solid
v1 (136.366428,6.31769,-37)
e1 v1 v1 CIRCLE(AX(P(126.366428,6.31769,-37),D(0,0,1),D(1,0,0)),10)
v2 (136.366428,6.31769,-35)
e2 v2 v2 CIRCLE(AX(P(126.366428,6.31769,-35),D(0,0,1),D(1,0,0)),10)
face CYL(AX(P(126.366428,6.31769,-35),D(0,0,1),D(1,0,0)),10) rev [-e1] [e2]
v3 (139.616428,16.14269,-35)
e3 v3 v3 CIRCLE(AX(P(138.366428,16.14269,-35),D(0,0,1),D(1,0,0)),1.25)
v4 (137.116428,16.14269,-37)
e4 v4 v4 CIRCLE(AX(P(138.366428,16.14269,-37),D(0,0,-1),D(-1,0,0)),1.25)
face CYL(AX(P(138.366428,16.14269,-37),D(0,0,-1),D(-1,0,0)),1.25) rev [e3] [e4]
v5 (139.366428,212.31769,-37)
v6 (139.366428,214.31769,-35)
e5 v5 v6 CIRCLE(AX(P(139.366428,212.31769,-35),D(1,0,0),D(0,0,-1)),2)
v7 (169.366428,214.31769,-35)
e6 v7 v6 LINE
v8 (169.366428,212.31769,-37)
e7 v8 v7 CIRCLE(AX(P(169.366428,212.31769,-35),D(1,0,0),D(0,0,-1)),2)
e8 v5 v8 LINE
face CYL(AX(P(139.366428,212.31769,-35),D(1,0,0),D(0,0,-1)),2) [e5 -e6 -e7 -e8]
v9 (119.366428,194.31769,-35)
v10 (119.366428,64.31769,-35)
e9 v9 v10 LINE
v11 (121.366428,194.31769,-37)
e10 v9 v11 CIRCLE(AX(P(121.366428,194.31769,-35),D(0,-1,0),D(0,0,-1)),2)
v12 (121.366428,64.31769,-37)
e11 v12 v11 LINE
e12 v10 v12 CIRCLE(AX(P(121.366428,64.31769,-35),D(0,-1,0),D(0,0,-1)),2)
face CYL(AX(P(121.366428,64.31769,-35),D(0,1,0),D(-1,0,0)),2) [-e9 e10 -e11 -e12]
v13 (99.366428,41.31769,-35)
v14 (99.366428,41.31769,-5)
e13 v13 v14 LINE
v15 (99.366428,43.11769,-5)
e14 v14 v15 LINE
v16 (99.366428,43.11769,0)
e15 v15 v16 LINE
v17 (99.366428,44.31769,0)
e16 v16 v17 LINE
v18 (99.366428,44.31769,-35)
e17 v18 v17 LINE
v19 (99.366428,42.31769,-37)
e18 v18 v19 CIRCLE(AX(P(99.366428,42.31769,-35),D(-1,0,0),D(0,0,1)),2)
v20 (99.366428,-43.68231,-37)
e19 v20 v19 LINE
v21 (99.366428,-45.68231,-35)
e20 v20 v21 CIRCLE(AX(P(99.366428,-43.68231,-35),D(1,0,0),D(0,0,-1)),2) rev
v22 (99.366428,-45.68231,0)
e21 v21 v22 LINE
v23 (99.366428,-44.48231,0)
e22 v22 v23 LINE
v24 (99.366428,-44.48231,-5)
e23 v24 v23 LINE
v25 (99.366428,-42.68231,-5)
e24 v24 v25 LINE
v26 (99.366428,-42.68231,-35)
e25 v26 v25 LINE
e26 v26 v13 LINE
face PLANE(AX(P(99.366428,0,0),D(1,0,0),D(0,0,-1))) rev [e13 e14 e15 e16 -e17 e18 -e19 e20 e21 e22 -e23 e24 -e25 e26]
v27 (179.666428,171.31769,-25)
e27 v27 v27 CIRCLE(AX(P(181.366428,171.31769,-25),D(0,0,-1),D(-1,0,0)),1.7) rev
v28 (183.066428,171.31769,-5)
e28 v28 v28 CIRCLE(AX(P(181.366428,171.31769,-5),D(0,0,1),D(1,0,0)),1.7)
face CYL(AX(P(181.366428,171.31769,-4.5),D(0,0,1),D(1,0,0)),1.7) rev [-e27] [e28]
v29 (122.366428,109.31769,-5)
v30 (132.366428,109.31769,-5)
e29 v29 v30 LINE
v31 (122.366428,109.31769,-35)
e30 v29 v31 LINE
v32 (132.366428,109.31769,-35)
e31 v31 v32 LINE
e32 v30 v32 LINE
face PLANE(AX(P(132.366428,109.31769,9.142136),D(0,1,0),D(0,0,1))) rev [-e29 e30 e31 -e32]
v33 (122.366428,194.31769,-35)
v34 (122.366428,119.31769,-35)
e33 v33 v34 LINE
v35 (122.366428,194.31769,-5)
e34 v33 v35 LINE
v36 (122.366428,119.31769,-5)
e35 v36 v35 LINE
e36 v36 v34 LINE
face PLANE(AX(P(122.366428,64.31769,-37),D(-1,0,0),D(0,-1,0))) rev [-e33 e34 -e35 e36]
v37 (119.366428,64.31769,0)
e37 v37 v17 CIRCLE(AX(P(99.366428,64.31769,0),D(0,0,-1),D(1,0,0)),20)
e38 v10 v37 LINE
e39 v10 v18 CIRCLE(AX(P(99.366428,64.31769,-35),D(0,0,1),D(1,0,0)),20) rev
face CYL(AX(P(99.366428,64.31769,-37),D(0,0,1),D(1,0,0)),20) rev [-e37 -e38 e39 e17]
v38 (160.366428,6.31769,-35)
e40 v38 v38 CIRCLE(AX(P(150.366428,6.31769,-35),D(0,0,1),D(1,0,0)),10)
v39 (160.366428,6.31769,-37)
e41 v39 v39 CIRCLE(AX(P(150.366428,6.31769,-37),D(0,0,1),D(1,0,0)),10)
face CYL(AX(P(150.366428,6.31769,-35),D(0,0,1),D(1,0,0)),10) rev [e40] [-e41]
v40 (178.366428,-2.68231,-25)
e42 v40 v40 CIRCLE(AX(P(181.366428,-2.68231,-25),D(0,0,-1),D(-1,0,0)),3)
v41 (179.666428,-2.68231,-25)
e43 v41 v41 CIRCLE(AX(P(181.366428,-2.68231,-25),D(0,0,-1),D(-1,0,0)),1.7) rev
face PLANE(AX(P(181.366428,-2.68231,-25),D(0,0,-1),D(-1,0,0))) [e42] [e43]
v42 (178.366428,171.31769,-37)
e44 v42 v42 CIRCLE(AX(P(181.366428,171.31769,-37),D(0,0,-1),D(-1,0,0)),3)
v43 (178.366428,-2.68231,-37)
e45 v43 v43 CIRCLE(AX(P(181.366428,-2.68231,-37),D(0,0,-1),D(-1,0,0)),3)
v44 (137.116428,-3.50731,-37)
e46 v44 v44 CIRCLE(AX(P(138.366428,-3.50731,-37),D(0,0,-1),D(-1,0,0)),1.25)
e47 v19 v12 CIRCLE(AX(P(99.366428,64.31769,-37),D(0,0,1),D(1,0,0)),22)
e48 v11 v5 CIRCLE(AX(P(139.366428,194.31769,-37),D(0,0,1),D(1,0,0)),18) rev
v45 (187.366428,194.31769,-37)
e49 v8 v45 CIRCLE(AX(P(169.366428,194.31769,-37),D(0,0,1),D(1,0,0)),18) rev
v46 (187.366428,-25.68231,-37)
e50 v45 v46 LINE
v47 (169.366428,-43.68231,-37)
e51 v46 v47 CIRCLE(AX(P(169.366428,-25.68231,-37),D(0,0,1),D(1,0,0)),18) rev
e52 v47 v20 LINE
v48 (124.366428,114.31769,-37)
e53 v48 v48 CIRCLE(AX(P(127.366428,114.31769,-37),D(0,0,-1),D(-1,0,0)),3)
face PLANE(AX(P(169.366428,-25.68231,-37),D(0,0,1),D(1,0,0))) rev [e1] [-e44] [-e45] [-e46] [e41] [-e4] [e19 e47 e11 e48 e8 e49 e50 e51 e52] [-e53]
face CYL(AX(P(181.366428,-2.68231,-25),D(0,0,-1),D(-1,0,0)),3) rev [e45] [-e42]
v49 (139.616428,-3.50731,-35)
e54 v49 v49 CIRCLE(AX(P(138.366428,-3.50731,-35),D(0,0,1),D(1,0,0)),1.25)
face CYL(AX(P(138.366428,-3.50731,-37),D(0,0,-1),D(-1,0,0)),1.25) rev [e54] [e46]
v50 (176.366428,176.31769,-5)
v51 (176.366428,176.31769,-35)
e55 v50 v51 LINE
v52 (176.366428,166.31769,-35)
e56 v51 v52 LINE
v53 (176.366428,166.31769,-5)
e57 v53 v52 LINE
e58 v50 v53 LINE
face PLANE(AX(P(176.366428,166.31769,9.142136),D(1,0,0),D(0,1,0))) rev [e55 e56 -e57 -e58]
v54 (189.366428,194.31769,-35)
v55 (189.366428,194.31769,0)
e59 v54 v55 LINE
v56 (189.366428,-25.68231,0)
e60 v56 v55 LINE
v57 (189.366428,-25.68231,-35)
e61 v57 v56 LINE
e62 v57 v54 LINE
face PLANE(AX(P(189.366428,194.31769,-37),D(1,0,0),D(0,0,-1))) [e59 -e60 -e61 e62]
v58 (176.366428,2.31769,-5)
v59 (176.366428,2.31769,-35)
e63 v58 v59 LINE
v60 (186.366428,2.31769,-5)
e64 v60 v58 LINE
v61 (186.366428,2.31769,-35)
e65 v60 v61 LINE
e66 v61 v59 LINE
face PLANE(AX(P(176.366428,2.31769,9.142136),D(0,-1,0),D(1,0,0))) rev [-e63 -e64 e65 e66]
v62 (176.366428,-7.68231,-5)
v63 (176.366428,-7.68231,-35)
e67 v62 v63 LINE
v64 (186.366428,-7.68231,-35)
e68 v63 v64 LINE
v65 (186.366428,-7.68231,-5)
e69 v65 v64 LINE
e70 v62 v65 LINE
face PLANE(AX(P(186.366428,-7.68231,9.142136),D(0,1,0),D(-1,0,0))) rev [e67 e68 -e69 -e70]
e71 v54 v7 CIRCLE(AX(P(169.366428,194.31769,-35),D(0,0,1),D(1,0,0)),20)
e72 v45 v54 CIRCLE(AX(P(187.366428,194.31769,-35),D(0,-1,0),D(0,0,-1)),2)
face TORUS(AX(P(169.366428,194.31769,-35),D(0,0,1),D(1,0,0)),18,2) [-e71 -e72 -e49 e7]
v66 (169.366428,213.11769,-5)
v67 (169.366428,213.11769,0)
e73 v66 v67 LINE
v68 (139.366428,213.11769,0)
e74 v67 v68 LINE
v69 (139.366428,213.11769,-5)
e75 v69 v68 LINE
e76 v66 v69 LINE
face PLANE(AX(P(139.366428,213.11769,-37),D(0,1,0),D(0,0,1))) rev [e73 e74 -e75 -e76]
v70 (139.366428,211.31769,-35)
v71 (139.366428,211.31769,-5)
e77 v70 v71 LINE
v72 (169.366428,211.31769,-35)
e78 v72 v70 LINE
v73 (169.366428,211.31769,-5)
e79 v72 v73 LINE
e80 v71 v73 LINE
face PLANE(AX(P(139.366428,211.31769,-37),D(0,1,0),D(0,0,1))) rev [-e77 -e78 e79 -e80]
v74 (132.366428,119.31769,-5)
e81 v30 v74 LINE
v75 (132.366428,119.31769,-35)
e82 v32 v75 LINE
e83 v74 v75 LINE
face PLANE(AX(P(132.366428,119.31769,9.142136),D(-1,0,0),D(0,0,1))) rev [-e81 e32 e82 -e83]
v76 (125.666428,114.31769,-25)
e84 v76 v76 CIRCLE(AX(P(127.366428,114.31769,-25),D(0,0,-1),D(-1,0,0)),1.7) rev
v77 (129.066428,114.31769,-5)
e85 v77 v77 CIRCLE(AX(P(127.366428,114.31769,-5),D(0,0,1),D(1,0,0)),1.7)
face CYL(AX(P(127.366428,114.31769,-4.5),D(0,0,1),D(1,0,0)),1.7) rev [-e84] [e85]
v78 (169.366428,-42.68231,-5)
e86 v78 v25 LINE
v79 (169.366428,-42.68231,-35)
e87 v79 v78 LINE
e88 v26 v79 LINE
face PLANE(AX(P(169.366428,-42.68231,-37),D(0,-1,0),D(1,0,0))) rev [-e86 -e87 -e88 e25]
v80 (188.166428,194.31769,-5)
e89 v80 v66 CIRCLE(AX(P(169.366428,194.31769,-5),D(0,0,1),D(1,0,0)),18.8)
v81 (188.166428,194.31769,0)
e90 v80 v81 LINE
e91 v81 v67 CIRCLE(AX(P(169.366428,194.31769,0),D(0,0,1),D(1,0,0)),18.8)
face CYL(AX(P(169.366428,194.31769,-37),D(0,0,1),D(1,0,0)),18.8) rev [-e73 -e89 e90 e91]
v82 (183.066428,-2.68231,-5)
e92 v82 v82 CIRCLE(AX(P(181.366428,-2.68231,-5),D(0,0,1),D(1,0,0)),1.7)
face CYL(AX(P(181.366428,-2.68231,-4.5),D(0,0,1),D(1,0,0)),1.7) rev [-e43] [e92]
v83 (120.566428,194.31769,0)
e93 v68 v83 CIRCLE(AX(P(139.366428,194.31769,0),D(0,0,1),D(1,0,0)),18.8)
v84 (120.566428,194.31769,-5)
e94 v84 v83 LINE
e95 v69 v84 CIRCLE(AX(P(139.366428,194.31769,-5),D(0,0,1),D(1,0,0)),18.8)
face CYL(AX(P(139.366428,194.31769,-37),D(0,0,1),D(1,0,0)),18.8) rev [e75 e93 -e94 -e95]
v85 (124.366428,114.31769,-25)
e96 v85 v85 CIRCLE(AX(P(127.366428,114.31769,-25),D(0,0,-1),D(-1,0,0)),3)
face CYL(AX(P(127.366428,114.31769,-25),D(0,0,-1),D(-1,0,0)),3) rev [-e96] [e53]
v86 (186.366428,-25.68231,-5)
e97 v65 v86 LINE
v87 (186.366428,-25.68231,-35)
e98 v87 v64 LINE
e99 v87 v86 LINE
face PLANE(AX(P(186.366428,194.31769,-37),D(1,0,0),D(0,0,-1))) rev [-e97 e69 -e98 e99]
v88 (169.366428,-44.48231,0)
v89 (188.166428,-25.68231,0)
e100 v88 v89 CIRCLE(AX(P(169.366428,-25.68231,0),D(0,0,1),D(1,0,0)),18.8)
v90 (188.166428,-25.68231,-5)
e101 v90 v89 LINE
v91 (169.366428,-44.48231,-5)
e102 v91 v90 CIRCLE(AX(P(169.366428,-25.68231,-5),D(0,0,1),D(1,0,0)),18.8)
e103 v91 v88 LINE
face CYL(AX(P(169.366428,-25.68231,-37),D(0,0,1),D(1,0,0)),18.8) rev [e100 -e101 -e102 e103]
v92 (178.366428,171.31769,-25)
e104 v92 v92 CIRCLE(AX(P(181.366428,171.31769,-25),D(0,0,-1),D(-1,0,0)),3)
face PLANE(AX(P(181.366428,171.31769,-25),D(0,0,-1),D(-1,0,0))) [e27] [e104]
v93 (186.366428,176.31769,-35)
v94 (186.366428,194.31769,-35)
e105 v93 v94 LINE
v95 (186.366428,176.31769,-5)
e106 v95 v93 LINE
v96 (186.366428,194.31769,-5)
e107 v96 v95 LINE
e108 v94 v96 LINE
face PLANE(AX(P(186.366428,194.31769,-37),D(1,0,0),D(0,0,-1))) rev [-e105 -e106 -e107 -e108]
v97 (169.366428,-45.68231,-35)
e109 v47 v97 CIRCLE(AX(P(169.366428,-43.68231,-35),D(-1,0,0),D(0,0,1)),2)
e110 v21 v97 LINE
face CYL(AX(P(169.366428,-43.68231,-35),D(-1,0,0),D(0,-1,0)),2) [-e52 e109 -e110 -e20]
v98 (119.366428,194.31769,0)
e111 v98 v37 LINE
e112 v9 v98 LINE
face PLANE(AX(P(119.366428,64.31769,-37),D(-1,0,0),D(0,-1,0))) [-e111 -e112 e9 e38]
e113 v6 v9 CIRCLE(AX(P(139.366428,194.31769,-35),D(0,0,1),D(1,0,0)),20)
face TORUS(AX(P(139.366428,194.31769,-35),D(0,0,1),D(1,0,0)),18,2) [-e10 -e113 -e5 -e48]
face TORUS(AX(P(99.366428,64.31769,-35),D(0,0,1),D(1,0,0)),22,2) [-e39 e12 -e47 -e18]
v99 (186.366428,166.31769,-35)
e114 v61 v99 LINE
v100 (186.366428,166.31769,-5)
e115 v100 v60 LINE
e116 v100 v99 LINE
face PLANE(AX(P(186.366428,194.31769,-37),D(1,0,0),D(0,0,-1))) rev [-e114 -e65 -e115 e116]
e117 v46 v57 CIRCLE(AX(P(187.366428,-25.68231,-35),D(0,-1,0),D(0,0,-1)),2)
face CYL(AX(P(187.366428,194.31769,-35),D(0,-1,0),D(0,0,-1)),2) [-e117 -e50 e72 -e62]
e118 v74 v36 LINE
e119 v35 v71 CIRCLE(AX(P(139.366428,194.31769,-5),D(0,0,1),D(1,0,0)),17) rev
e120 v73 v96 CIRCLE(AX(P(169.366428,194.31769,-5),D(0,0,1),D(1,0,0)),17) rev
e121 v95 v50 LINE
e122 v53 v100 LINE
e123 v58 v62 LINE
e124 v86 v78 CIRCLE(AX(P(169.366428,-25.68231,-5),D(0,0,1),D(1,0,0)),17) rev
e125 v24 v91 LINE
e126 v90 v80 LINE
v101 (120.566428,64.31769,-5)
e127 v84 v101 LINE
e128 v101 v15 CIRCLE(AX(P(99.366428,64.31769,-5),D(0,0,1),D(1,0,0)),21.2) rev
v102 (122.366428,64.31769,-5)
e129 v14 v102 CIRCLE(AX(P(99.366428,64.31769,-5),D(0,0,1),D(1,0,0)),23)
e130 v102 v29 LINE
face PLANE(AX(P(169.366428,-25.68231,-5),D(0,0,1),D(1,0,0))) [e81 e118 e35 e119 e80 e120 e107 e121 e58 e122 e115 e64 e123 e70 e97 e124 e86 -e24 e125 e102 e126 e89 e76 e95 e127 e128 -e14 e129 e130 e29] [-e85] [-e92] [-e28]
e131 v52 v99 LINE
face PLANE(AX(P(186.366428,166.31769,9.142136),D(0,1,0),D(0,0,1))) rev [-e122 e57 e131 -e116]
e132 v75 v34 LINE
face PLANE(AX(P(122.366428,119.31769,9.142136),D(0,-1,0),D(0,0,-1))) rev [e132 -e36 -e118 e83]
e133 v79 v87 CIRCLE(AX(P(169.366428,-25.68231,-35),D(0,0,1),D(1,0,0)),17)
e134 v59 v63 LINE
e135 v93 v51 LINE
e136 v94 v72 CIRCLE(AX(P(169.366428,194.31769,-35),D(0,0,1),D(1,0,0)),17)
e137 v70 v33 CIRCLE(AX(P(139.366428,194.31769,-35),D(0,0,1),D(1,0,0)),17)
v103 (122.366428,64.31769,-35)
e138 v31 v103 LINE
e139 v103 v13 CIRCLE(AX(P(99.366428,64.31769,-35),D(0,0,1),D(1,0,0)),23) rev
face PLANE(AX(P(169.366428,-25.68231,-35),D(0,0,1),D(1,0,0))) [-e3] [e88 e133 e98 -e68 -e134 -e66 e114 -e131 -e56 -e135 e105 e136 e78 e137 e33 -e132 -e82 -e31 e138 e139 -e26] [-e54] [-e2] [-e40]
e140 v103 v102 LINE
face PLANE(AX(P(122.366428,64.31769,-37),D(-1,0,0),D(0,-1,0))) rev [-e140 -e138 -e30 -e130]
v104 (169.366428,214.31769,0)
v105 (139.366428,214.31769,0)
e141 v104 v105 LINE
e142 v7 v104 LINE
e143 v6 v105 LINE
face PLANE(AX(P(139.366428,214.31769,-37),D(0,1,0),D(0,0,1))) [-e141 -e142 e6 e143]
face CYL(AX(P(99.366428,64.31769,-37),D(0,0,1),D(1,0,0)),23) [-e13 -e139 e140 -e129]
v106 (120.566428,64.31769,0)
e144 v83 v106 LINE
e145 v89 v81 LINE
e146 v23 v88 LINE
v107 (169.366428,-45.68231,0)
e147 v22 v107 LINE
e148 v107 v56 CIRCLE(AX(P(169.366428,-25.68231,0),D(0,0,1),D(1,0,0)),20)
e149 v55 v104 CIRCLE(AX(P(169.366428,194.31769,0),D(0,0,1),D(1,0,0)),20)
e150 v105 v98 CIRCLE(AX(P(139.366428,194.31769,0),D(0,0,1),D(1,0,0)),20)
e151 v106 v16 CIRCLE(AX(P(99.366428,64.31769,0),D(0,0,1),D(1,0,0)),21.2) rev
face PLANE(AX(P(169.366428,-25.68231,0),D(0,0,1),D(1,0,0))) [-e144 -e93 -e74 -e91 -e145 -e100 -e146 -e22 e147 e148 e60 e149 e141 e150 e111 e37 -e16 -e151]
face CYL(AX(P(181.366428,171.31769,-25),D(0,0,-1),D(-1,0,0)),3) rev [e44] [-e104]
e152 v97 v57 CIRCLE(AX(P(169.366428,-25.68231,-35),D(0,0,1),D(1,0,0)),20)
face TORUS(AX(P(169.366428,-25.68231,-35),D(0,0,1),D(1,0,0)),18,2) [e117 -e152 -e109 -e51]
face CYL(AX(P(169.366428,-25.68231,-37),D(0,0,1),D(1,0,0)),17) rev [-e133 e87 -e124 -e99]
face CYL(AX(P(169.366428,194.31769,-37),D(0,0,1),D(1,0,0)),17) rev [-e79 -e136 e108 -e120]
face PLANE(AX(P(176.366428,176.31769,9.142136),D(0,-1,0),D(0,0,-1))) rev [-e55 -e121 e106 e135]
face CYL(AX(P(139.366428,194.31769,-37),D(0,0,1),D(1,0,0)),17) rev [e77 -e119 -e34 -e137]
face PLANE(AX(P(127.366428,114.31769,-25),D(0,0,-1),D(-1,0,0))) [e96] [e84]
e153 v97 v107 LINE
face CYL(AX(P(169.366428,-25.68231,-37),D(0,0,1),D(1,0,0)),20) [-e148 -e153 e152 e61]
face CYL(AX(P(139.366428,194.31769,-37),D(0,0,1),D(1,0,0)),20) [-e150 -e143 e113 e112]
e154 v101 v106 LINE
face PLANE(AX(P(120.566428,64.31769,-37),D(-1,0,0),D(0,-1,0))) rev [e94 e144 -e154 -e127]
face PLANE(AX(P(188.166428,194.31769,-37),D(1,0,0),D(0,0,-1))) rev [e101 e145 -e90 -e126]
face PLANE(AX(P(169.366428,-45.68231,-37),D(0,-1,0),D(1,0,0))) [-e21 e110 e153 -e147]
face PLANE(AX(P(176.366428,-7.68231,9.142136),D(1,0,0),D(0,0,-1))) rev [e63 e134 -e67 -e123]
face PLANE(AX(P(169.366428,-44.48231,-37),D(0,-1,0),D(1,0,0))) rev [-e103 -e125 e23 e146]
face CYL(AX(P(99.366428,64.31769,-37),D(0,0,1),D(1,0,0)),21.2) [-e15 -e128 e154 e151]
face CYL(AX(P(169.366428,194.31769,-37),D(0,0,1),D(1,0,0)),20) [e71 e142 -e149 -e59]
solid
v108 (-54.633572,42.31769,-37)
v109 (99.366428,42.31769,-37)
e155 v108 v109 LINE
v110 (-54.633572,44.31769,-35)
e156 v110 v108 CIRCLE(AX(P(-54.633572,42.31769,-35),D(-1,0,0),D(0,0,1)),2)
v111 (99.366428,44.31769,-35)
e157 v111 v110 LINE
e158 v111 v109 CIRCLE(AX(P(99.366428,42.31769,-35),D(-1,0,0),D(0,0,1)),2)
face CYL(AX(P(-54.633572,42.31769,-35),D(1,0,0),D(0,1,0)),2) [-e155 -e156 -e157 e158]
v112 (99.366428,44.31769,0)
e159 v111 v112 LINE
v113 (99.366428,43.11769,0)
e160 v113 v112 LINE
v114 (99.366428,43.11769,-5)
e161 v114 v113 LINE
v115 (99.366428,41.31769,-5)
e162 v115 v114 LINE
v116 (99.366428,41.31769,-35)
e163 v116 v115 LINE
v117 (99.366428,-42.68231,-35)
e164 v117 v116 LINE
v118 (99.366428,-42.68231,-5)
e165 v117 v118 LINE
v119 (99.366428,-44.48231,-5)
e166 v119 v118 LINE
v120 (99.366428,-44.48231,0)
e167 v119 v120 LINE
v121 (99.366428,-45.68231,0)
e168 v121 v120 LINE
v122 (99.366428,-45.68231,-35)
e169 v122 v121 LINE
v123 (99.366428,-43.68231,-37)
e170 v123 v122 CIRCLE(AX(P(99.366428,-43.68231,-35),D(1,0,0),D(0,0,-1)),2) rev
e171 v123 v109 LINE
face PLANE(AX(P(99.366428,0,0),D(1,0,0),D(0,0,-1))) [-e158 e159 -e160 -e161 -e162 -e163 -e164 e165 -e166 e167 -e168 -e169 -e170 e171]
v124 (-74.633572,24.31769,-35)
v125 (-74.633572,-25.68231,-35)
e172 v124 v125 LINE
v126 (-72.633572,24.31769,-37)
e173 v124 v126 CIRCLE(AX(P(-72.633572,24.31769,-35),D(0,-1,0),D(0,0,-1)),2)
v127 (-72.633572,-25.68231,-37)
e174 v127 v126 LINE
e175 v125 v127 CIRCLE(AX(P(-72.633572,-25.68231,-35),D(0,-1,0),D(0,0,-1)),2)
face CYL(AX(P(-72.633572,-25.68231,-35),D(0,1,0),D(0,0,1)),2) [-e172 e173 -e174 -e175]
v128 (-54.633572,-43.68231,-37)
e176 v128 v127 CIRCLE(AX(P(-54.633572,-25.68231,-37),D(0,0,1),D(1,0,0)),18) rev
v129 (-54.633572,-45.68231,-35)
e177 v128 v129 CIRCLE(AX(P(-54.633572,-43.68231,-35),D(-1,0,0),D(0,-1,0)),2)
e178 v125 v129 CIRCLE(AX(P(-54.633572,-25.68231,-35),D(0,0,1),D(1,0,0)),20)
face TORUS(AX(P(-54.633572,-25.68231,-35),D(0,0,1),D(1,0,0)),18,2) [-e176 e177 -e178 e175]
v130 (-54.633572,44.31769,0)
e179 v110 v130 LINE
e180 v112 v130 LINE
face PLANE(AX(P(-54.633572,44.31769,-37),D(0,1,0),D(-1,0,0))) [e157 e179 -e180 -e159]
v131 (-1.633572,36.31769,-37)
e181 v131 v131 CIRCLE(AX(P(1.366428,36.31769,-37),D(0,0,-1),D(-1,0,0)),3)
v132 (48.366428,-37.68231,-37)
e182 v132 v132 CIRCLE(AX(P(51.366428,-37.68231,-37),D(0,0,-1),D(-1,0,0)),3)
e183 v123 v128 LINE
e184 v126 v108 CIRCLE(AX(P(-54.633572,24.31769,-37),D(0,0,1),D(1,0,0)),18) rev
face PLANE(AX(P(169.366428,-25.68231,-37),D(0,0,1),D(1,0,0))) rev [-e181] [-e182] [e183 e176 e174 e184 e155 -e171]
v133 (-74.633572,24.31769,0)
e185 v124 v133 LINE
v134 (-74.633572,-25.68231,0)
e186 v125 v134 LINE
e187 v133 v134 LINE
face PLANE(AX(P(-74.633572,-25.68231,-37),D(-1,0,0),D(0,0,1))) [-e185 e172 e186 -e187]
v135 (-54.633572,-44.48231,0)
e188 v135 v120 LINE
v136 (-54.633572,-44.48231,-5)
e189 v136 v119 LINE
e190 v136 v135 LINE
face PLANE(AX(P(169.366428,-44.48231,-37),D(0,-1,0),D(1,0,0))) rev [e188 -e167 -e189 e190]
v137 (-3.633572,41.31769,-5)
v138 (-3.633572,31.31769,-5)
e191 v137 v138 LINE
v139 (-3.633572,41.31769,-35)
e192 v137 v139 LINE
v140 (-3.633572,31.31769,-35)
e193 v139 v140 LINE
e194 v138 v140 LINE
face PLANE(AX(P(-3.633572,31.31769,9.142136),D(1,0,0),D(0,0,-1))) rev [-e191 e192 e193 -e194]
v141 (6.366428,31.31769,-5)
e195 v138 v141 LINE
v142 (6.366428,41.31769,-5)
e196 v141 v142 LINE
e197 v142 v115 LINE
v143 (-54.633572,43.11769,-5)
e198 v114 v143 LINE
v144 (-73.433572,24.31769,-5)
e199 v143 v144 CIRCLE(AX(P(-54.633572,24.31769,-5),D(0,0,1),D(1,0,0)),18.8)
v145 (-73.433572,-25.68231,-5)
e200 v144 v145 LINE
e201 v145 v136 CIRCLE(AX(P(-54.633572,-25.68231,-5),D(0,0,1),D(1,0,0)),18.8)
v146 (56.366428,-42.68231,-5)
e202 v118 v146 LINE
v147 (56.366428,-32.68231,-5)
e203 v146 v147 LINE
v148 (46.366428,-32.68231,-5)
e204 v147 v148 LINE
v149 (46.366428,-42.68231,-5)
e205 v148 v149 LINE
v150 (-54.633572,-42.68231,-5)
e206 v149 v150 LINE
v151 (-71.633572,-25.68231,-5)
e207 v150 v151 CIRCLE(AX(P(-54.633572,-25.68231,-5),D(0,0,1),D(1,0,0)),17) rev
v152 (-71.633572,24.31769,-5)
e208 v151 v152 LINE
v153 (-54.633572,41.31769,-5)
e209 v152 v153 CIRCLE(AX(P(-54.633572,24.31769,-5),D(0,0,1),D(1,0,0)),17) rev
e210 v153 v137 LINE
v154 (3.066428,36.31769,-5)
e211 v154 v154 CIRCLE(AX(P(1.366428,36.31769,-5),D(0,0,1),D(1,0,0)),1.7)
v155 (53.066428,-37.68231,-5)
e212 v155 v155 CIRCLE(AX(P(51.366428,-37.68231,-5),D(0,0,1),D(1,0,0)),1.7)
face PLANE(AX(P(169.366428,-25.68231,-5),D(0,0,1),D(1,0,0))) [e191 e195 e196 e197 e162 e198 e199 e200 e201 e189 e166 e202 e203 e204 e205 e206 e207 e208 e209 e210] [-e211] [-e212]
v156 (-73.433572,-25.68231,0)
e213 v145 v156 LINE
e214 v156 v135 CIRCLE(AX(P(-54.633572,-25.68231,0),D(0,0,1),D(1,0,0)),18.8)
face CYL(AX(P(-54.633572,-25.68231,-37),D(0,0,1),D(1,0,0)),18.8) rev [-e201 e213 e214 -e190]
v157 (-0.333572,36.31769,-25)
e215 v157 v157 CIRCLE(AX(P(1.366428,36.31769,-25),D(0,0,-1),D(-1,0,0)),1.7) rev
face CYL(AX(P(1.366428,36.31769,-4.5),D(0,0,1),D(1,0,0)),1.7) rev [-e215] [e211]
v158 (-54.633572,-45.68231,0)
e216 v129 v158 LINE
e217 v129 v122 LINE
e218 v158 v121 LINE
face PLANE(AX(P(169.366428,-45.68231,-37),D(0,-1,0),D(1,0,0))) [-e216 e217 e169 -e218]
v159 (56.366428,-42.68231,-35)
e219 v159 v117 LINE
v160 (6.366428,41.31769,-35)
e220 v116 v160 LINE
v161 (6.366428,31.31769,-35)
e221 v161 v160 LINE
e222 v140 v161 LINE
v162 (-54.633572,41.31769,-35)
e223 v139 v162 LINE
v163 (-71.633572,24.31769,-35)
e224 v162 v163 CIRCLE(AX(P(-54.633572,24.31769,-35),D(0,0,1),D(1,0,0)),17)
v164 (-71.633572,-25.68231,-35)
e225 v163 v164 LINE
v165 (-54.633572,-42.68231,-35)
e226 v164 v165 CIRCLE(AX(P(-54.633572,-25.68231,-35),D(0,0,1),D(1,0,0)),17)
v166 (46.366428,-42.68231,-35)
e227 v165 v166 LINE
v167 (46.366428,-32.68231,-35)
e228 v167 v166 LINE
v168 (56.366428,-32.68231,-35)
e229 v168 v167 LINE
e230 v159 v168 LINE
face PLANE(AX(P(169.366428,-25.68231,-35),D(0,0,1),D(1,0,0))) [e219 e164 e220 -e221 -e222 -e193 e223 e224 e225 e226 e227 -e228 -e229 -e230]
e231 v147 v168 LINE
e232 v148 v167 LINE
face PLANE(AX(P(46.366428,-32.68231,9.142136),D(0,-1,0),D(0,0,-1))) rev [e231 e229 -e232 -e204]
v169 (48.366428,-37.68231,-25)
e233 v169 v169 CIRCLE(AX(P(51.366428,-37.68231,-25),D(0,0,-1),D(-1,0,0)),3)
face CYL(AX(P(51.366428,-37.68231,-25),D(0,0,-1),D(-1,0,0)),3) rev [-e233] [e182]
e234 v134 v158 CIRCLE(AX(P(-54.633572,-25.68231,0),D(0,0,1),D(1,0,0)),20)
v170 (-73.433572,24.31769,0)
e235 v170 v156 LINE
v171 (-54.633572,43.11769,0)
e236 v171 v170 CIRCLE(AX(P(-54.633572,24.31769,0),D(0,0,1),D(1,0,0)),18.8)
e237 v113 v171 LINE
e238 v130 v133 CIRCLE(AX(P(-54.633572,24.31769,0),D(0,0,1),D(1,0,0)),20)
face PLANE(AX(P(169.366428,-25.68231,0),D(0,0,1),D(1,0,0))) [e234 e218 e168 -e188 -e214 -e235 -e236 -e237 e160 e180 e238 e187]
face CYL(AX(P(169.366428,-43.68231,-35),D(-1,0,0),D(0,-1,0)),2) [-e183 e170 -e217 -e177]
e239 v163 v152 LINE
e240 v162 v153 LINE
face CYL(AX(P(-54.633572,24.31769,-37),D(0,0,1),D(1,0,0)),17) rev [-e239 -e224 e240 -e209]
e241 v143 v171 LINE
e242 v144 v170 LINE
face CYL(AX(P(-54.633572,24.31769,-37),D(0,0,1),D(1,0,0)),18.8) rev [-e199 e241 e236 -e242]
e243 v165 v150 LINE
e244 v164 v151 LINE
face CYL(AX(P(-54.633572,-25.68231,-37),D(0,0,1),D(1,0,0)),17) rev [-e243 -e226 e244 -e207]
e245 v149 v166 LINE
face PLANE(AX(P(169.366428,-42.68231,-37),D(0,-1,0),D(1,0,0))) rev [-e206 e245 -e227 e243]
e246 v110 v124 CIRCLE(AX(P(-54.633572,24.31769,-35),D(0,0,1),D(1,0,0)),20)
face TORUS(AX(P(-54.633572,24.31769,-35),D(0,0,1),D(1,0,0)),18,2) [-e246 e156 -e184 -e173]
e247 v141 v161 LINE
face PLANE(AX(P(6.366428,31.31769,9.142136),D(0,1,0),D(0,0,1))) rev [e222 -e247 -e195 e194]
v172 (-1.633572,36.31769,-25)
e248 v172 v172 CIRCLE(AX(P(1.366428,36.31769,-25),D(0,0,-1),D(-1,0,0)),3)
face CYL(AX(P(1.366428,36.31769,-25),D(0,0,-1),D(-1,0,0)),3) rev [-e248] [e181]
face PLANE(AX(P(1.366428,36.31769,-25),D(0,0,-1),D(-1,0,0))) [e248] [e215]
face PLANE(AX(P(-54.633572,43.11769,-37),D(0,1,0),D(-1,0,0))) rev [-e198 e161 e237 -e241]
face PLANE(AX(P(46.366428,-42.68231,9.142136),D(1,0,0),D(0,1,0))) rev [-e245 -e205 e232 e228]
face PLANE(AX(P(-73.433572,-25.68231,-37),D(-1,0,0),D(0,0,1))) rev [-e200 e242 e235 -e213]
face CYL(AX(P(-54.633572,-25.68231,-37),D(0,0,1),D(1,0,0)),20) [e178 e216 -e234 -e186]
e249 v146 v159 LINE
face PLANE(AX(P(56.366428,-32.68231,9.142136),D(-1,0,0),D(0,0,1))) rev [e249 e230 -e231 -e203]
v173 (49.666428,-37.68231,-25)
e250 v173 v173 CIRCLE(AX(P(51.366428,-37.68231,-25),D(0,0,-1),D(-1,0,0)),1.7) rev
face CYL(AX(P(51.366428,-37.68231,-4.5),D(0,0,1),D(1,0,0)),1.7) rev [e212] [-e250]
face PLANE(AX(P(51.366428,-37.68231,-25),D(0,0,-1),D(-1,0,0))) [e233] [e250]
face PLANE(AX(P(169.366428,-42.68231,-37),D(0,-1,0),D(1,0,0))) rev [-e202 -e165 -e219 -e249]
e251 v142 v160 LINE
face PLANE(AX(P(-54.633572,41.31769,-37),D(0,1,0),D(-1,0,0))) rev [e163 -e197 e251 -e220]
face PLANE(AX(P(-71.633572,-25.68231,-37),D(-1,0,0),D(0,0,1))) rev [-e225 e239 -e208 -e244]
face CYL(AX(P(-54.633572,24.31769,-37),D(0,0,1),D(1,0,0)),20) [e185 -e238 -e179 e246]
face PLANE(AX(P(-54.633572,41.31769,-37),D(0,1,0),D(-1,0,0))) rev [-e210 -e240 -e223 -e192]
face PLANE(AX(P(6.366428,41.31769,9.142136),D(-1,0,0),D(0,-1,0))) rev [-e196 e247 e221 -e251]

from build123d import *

# Parameters (mm, degrees)
BOX_EXTRUDE_DEPTH                 = 37
SHELL1_T                          = -1.2
SHELL1_THICKNESS_2_DEPTH          = 30.8
SHELL2_START                      = -35
SHELL2_DEPTH                      = 30
SKETCH2_W                         = 10
SKETCH2_H                         = 10
SQUARES_EXTRUDE_DEPTH             = 30
SQUARES_M3_CLEARANCE_HOLES_D      = 3.4
SQUARES_M3_CLEARANCE_HOLES_DEPTH  = 46
SQUARES_M3_CLEARANCE_HOLES_TIP    = 1.021463052
SKETCH5_R                         = 3
SQUARESCREWS_CUT_EXTRUDE_DEPTH    = 12
FILLET1_R                         = 2
DOVETAIL_M18_CLEARANCE_HOLE_D     = 20
DOVETAIL_M18_CLEARANCE_HOLE_DEPTH = 46
DOVETAIL_M18_CLEARANCE_HOLE_TIP   = 6.00860619
DOVETAIL_M3_CLEARANCE_HOLE_D      = 2.5
DOVETAIL_M3_CLEARANCE_HOLE_DEPTH  = 46
DOVETAIL_M3_CLEARANCE_HOLE_TIP    = 0.751075774


# Read off the part's stored shape, not the designer's step: Shell2
with BuildPart() as part:
    # Sketch1 → Box-Extrude (new body)
    with BuildSketch(Plane.XY):
        with BuildLine():
            Line((189.366428174, 55.055128635), (189.366428174, -25.682309997))
            ThreePointArc((189.366428174, -25.682309997), (183.508563798, -39.824445621), (169.366428174, -45.682309997))
            Line((169.366428174, -45.682309997), (0, -45.682309997))
            Line((0, -45.682309997), (-54.633571826, -45.682309997))
            ThreePointArc((-54.633571826, -45.682309997), (-68.77570745, -39.824445621), (-74.633571826, -25.682309997))
            Line((-74.633571826, -25.682309997), (-74.633571826, 24.317690003))
            ThreePointArc((-74.633571826, 24.317690003), (-68.77570745, 38.459825627), (-54.633571826, 44.317690003))
            Line((-54.633571826, 44.317690003), (99.366428174, 44.317690003))
            ThreePointArc((99.366428174, 44.317690003), (109.72858945, 47.211386671), (117.092255571, 55.055128635))
            ThreePointArc((117.092255571, 55.055128635), (118.789565767, 59.548861422), (119.366428174, 64.317690003))
            Line((119.366428174, 64.317690003), (119.366428174, 194.317690003))
            ThreePointArc((119.366428174, 194.317690003), (125.22429255, 208.459825627), (139.366428174, 214.317690003))
            Line((139.366428174, 214.317690003), (169.366428174, 214.317690003))
            ThreePointArc((169.366428174, 214.317690003), (183.508563798, 208.459825627), (189.366428174, 194.317690003))
            Line((189.366428174, 194.317690003), (189.366428174, 55.055128635))
        make_face()
    extrude(amount=-BOX_EXTRUDE_DEPTH)

    # Shell1
    shell1_openings = [part.faces().sort_by_distance(p)[0] for p in [
        (90.029023859, 42.316719336, 0),
    ]]
    offset(amount=SHELL1_T, openings=shell1_openings, kind=Kind.INTERSECTION)

    # Shell1 thickness 2 face (on inner face of the shell) → Shell1 thickness 2 (add)
    with BuildSketch(Plane(origin=(90.047419114, 41.98561552, -35.8), x_dir=(-1, 0, 0), z_dir=(0, 0, -1))):
        with BuildLine():
            Line((-9.31900906, 1.132074483), (144.68099094, 1.132074483))
            ThreePointArc((144.68099094, 1.132074483), (157.974598426, -4.374318031), (163.48099094, -17.667925517))
            Line((163.48099094, -17.667925517), (163.48099094, -67.667925517))
            ThreePointArc((163.48099094, -67.667925517), (157.974598426, -80.961533003), (144.68099094, -86.467925517))
            Line((144.68099094, -86.467925517), (-79.31900906, -86.467925517))
            ThreePointArc((-79.31900906, -86.467925517), (-92.612616546, -80.961533003), (-98.11900906, -67.667925517))
            Line((-98.11900906, -67.667925517), (-98.11900906, 152.332074483))
            ThreePointArc((-98.11900906, 152.332074483), (-92.612616546, 165.625681969), (-79.31900906, 171.132074483))
            Line((-79.31900906, 171.132074483), (-49.31900906, 171.132074483))
            ThreePointArc((-49.31900906, 171.132074483), (-36.025401574, 165.625681969), (-30.51900906, 152.332074483))
            Line((-30.51900906, 152.332074483), (-30.51900906, 22.332074483))
            ThreePointArc((-30.51900906, 22.332074483), (-24.309672821, 7.341410722), (-9.31900906, 1.132074483))
        make_face()
    extrude(amount=-SHELL1_THICKNESS_2_DEPTH)

    # Shell2 outline → Shell2 (cut)
    with BuildSketch(Plane.XY.offset(SHELL2_START)):
        with BuildLine():
            Line((-54.633571826, -42.682309997), (169.366428174, -42.682309997))
            ThreePointArc((169.366428174, -42.682309997), (181.387243454, -37.703125277), (186.366428174, -25.682309997))
            Line((186.366428174, -25.682309997), (186.366428174, 194.317690003))
            ThreePointArc((186.366428174, 194.317690003), (181.387243454, 206.338505283), (169.366428174, 211.317690003))
            Line((169.366428174, 211.317690003), (139.366428174, 211.317690003))
            ThreePointArc((139.366428174, 211.317690003), (127.345612894, 206.338505283), (122.366428174, 194.317690003))
            Line((122.366428174, 194.317690003), (122.366428174, 64.317690003))
            ThreePointArc((122.366428174, 64.317690003), (115.629884141, 48.054234036), (99.366428174, 41.317690003))
            Line((99.366428174, 41.317690003), (-54.633571826, 41.317690003))
            ThreePointArc((-54.633571826, 41.317690003), (-66.654387106, 36.338505283), (-71.633571826, 24.317690003))
            Line((-71.633571826, 24.317690003), (-71.633571826, -25.682309997))
            ThreePointArc((-71.633571826, -25.682309997), (-66.654387106, -37.703125277), (-54.633571826, -42.682309997))
        make_face()
    extrude(amount=SHELL2_DEPTH, mode=Mode.SUBTRACT)

    # Sketch2 → Squares-Extrude (add)
    with BuildSketch(Plane.XY.offset(-35)):
        with Locations((1.366428174, 36.317690003)):
            Rectangle(SKETCH2_W, SKETCH2_H)
        with Locations((127.366428174, 114.317690003)):
            Rectangle(SKETCH2_W, SKETCH2_H)
        with Locations((51.366428174, -37.682309997)):
            Rectangle(SKETCH2_W, SKETCH2_H)
        with Locations((181.366428174, -2.682309997)):
            Rectangle(SKETCH2_W, SKETCH2_H)
        with Locations((181.366428174, 171.317690003)):
            Rectangle(SKETCH2_W, SKETCH2_H)
    extrude(amount=SQUARES_EXTRUDE_DEPTH)

    # Squares M3 Clearance Holes
    with Locations(Plane(origin=(0, 0, -4.5), x_dir=(-1, 0, 0), z_dir=(0, 0, 1))):
        with Locations((-51.366428174, 37.682309997), (-1.366428174, -36.317690003), (-181.366428174, 2.682309997), (-127.366428174, -114.317690003), (-181.366428174, -171.317690003)):
            Hole(SQUARES_M3_CLEARANCE_HOLES_D / 2, depth=SQUARES_M3_CLEARANCE_HOLES_DEPTH)
            with Locations((0, 0, -(SQUARES_M3_CLEARANCE_HOLES_DEPTH + SQUARES_M3_CLEARANCE_HOLES_TIP / 2))):  # 118° drill point
                Cone(0, SQUARES_M3_CLEARANCE_HOLES_D / 2, SQUARES_M3_CLEARANCE_HOLES_TIP, mode=Mode.SUBTRACT)

    # Sketch5 → SquareScrews Cut-Extrude (cut)
    with BuildSketch(Plane(origin=(0, 0, -37), x_dir=(-1, 0, 0), z_dir=(0, 0, -1))):
        with Locations((-181.366428174, 171.317690003)):
            Circle(SKETCH5_R)
        with Locations((-181.366428174, -2.682309997)):
            Circle(SKETCH5_R)
        with Locations((-51.366428174, -37.682309997)):
            Circle(SKETCH5_R)
        with Locations((-1.366428174, 36.317690003)):
            Circle(SKETCH5_R)
        with Locations((-127.366428174, 114.317690003)):
            Circle(SKETCH5_R)
    extrude(amount=-SQUARESCREWS_CUT_EXTRUDE_DEPTH, mode=Mode.SUBTRACT)

    # Fillet1
    fillet1_edges = [part.edges().sort_by_distance(p)[0] for p in [
        (183.508563798, 208.459825627, -37),
        (154.366428174, 214.317690003, -37),
        (125.22429255, 208.459825627, -37),
        (119.366428174, 129.317690003, -37),
        (113.508563798, 50.175554379, -37),
        (22.366428174, 44.317690003, -37),
        (-68.77570745, 38.459825627, -37),
        (-74.633571826, -0.682309997, -37),
        (183.508563798, -39.824445621, -37),
        (-68.77570745, -39.824445621, -37),
        (57.366428174, -45.682309997, -37),
        (189.366428174, 84.317690003, -37),
    ]]
    fillet(fillet1_edges, radius=FILLET1_R)

    # Dovetail M18 Clearance Hole
    with Locations(Plane.XY.offset(-35)):
        with Locations((126.366428174, 6.317690003), (150.366428174, 6.317690003)):
            Hole(DOVETAIL_M18_CLEARANCE_HOLE_D / 2, depth=DOVETAIL_M18_CLEARANCE_HOLE_DEPTH)
            with Locations((0, 0, -(DOVETAIL_M18_CLEARANCE_HOLE_DEPTH + DOVETAIL_M18_CLEARANCE_HOLE_TIP / 2))):  # 118° drill point
                Cone(0, DOVETAIL_M18_CLEARANCE_HOLE_D / 2, DOVETAIL_M18_CLEARANCE_HOLE_TIP, mode=Mode.SUBTRACT)

    # Dovetail M3 Clearance Hole
    with Locations(Plane(origin=(0, 0, -37), x_dir=(1, 0, 0), z_dir=(0, 0, -1))):
        with Locations((138.366428174, 3.507309997), (138.366428174, -16.142690003)):
            Hole(DOVETAIL_M3_CLEARANCE_HOLE_D / 2, depth=DOVETAIL_M3_CLEARANCE_HOLE_DEPTH)
            with Locations((0, 0, -(DOVETAIL_M3_CLEARANCE_HOLE_DEPTH + DOVETAIL_M3_CLEARANCE_HOLE_TIP / 2))):  # 118° drill point
                Cone(0, DOVETAIL_M3_CLEARANCE_HOLE_D / 2, DOVETAIL_M3_CLEARANCE_HOLE_TIP, mode=Mode.SUBTRACT)


with BuildPart() as body_2:
    # Split1: the piece on the far side of the plane
    add(part.part)
    split(bisect_by=Plane(origin=(99.366428174, 0, 0), x_dir=(0, 0, 1), z_dir=(1, 0, 0)), keep=Keep.BOTTOM)


with BuildPart() as part_1:
    add(part.part)

    # Split1
    split(bisect_by=Plane(origin=(99.366428174, 0, 0), x_dir=(0, 0, 1), z_dir=(1, 0, 0)), keep=Keep.TOP)


solid = Compound([body_2.part, part_1.part])
